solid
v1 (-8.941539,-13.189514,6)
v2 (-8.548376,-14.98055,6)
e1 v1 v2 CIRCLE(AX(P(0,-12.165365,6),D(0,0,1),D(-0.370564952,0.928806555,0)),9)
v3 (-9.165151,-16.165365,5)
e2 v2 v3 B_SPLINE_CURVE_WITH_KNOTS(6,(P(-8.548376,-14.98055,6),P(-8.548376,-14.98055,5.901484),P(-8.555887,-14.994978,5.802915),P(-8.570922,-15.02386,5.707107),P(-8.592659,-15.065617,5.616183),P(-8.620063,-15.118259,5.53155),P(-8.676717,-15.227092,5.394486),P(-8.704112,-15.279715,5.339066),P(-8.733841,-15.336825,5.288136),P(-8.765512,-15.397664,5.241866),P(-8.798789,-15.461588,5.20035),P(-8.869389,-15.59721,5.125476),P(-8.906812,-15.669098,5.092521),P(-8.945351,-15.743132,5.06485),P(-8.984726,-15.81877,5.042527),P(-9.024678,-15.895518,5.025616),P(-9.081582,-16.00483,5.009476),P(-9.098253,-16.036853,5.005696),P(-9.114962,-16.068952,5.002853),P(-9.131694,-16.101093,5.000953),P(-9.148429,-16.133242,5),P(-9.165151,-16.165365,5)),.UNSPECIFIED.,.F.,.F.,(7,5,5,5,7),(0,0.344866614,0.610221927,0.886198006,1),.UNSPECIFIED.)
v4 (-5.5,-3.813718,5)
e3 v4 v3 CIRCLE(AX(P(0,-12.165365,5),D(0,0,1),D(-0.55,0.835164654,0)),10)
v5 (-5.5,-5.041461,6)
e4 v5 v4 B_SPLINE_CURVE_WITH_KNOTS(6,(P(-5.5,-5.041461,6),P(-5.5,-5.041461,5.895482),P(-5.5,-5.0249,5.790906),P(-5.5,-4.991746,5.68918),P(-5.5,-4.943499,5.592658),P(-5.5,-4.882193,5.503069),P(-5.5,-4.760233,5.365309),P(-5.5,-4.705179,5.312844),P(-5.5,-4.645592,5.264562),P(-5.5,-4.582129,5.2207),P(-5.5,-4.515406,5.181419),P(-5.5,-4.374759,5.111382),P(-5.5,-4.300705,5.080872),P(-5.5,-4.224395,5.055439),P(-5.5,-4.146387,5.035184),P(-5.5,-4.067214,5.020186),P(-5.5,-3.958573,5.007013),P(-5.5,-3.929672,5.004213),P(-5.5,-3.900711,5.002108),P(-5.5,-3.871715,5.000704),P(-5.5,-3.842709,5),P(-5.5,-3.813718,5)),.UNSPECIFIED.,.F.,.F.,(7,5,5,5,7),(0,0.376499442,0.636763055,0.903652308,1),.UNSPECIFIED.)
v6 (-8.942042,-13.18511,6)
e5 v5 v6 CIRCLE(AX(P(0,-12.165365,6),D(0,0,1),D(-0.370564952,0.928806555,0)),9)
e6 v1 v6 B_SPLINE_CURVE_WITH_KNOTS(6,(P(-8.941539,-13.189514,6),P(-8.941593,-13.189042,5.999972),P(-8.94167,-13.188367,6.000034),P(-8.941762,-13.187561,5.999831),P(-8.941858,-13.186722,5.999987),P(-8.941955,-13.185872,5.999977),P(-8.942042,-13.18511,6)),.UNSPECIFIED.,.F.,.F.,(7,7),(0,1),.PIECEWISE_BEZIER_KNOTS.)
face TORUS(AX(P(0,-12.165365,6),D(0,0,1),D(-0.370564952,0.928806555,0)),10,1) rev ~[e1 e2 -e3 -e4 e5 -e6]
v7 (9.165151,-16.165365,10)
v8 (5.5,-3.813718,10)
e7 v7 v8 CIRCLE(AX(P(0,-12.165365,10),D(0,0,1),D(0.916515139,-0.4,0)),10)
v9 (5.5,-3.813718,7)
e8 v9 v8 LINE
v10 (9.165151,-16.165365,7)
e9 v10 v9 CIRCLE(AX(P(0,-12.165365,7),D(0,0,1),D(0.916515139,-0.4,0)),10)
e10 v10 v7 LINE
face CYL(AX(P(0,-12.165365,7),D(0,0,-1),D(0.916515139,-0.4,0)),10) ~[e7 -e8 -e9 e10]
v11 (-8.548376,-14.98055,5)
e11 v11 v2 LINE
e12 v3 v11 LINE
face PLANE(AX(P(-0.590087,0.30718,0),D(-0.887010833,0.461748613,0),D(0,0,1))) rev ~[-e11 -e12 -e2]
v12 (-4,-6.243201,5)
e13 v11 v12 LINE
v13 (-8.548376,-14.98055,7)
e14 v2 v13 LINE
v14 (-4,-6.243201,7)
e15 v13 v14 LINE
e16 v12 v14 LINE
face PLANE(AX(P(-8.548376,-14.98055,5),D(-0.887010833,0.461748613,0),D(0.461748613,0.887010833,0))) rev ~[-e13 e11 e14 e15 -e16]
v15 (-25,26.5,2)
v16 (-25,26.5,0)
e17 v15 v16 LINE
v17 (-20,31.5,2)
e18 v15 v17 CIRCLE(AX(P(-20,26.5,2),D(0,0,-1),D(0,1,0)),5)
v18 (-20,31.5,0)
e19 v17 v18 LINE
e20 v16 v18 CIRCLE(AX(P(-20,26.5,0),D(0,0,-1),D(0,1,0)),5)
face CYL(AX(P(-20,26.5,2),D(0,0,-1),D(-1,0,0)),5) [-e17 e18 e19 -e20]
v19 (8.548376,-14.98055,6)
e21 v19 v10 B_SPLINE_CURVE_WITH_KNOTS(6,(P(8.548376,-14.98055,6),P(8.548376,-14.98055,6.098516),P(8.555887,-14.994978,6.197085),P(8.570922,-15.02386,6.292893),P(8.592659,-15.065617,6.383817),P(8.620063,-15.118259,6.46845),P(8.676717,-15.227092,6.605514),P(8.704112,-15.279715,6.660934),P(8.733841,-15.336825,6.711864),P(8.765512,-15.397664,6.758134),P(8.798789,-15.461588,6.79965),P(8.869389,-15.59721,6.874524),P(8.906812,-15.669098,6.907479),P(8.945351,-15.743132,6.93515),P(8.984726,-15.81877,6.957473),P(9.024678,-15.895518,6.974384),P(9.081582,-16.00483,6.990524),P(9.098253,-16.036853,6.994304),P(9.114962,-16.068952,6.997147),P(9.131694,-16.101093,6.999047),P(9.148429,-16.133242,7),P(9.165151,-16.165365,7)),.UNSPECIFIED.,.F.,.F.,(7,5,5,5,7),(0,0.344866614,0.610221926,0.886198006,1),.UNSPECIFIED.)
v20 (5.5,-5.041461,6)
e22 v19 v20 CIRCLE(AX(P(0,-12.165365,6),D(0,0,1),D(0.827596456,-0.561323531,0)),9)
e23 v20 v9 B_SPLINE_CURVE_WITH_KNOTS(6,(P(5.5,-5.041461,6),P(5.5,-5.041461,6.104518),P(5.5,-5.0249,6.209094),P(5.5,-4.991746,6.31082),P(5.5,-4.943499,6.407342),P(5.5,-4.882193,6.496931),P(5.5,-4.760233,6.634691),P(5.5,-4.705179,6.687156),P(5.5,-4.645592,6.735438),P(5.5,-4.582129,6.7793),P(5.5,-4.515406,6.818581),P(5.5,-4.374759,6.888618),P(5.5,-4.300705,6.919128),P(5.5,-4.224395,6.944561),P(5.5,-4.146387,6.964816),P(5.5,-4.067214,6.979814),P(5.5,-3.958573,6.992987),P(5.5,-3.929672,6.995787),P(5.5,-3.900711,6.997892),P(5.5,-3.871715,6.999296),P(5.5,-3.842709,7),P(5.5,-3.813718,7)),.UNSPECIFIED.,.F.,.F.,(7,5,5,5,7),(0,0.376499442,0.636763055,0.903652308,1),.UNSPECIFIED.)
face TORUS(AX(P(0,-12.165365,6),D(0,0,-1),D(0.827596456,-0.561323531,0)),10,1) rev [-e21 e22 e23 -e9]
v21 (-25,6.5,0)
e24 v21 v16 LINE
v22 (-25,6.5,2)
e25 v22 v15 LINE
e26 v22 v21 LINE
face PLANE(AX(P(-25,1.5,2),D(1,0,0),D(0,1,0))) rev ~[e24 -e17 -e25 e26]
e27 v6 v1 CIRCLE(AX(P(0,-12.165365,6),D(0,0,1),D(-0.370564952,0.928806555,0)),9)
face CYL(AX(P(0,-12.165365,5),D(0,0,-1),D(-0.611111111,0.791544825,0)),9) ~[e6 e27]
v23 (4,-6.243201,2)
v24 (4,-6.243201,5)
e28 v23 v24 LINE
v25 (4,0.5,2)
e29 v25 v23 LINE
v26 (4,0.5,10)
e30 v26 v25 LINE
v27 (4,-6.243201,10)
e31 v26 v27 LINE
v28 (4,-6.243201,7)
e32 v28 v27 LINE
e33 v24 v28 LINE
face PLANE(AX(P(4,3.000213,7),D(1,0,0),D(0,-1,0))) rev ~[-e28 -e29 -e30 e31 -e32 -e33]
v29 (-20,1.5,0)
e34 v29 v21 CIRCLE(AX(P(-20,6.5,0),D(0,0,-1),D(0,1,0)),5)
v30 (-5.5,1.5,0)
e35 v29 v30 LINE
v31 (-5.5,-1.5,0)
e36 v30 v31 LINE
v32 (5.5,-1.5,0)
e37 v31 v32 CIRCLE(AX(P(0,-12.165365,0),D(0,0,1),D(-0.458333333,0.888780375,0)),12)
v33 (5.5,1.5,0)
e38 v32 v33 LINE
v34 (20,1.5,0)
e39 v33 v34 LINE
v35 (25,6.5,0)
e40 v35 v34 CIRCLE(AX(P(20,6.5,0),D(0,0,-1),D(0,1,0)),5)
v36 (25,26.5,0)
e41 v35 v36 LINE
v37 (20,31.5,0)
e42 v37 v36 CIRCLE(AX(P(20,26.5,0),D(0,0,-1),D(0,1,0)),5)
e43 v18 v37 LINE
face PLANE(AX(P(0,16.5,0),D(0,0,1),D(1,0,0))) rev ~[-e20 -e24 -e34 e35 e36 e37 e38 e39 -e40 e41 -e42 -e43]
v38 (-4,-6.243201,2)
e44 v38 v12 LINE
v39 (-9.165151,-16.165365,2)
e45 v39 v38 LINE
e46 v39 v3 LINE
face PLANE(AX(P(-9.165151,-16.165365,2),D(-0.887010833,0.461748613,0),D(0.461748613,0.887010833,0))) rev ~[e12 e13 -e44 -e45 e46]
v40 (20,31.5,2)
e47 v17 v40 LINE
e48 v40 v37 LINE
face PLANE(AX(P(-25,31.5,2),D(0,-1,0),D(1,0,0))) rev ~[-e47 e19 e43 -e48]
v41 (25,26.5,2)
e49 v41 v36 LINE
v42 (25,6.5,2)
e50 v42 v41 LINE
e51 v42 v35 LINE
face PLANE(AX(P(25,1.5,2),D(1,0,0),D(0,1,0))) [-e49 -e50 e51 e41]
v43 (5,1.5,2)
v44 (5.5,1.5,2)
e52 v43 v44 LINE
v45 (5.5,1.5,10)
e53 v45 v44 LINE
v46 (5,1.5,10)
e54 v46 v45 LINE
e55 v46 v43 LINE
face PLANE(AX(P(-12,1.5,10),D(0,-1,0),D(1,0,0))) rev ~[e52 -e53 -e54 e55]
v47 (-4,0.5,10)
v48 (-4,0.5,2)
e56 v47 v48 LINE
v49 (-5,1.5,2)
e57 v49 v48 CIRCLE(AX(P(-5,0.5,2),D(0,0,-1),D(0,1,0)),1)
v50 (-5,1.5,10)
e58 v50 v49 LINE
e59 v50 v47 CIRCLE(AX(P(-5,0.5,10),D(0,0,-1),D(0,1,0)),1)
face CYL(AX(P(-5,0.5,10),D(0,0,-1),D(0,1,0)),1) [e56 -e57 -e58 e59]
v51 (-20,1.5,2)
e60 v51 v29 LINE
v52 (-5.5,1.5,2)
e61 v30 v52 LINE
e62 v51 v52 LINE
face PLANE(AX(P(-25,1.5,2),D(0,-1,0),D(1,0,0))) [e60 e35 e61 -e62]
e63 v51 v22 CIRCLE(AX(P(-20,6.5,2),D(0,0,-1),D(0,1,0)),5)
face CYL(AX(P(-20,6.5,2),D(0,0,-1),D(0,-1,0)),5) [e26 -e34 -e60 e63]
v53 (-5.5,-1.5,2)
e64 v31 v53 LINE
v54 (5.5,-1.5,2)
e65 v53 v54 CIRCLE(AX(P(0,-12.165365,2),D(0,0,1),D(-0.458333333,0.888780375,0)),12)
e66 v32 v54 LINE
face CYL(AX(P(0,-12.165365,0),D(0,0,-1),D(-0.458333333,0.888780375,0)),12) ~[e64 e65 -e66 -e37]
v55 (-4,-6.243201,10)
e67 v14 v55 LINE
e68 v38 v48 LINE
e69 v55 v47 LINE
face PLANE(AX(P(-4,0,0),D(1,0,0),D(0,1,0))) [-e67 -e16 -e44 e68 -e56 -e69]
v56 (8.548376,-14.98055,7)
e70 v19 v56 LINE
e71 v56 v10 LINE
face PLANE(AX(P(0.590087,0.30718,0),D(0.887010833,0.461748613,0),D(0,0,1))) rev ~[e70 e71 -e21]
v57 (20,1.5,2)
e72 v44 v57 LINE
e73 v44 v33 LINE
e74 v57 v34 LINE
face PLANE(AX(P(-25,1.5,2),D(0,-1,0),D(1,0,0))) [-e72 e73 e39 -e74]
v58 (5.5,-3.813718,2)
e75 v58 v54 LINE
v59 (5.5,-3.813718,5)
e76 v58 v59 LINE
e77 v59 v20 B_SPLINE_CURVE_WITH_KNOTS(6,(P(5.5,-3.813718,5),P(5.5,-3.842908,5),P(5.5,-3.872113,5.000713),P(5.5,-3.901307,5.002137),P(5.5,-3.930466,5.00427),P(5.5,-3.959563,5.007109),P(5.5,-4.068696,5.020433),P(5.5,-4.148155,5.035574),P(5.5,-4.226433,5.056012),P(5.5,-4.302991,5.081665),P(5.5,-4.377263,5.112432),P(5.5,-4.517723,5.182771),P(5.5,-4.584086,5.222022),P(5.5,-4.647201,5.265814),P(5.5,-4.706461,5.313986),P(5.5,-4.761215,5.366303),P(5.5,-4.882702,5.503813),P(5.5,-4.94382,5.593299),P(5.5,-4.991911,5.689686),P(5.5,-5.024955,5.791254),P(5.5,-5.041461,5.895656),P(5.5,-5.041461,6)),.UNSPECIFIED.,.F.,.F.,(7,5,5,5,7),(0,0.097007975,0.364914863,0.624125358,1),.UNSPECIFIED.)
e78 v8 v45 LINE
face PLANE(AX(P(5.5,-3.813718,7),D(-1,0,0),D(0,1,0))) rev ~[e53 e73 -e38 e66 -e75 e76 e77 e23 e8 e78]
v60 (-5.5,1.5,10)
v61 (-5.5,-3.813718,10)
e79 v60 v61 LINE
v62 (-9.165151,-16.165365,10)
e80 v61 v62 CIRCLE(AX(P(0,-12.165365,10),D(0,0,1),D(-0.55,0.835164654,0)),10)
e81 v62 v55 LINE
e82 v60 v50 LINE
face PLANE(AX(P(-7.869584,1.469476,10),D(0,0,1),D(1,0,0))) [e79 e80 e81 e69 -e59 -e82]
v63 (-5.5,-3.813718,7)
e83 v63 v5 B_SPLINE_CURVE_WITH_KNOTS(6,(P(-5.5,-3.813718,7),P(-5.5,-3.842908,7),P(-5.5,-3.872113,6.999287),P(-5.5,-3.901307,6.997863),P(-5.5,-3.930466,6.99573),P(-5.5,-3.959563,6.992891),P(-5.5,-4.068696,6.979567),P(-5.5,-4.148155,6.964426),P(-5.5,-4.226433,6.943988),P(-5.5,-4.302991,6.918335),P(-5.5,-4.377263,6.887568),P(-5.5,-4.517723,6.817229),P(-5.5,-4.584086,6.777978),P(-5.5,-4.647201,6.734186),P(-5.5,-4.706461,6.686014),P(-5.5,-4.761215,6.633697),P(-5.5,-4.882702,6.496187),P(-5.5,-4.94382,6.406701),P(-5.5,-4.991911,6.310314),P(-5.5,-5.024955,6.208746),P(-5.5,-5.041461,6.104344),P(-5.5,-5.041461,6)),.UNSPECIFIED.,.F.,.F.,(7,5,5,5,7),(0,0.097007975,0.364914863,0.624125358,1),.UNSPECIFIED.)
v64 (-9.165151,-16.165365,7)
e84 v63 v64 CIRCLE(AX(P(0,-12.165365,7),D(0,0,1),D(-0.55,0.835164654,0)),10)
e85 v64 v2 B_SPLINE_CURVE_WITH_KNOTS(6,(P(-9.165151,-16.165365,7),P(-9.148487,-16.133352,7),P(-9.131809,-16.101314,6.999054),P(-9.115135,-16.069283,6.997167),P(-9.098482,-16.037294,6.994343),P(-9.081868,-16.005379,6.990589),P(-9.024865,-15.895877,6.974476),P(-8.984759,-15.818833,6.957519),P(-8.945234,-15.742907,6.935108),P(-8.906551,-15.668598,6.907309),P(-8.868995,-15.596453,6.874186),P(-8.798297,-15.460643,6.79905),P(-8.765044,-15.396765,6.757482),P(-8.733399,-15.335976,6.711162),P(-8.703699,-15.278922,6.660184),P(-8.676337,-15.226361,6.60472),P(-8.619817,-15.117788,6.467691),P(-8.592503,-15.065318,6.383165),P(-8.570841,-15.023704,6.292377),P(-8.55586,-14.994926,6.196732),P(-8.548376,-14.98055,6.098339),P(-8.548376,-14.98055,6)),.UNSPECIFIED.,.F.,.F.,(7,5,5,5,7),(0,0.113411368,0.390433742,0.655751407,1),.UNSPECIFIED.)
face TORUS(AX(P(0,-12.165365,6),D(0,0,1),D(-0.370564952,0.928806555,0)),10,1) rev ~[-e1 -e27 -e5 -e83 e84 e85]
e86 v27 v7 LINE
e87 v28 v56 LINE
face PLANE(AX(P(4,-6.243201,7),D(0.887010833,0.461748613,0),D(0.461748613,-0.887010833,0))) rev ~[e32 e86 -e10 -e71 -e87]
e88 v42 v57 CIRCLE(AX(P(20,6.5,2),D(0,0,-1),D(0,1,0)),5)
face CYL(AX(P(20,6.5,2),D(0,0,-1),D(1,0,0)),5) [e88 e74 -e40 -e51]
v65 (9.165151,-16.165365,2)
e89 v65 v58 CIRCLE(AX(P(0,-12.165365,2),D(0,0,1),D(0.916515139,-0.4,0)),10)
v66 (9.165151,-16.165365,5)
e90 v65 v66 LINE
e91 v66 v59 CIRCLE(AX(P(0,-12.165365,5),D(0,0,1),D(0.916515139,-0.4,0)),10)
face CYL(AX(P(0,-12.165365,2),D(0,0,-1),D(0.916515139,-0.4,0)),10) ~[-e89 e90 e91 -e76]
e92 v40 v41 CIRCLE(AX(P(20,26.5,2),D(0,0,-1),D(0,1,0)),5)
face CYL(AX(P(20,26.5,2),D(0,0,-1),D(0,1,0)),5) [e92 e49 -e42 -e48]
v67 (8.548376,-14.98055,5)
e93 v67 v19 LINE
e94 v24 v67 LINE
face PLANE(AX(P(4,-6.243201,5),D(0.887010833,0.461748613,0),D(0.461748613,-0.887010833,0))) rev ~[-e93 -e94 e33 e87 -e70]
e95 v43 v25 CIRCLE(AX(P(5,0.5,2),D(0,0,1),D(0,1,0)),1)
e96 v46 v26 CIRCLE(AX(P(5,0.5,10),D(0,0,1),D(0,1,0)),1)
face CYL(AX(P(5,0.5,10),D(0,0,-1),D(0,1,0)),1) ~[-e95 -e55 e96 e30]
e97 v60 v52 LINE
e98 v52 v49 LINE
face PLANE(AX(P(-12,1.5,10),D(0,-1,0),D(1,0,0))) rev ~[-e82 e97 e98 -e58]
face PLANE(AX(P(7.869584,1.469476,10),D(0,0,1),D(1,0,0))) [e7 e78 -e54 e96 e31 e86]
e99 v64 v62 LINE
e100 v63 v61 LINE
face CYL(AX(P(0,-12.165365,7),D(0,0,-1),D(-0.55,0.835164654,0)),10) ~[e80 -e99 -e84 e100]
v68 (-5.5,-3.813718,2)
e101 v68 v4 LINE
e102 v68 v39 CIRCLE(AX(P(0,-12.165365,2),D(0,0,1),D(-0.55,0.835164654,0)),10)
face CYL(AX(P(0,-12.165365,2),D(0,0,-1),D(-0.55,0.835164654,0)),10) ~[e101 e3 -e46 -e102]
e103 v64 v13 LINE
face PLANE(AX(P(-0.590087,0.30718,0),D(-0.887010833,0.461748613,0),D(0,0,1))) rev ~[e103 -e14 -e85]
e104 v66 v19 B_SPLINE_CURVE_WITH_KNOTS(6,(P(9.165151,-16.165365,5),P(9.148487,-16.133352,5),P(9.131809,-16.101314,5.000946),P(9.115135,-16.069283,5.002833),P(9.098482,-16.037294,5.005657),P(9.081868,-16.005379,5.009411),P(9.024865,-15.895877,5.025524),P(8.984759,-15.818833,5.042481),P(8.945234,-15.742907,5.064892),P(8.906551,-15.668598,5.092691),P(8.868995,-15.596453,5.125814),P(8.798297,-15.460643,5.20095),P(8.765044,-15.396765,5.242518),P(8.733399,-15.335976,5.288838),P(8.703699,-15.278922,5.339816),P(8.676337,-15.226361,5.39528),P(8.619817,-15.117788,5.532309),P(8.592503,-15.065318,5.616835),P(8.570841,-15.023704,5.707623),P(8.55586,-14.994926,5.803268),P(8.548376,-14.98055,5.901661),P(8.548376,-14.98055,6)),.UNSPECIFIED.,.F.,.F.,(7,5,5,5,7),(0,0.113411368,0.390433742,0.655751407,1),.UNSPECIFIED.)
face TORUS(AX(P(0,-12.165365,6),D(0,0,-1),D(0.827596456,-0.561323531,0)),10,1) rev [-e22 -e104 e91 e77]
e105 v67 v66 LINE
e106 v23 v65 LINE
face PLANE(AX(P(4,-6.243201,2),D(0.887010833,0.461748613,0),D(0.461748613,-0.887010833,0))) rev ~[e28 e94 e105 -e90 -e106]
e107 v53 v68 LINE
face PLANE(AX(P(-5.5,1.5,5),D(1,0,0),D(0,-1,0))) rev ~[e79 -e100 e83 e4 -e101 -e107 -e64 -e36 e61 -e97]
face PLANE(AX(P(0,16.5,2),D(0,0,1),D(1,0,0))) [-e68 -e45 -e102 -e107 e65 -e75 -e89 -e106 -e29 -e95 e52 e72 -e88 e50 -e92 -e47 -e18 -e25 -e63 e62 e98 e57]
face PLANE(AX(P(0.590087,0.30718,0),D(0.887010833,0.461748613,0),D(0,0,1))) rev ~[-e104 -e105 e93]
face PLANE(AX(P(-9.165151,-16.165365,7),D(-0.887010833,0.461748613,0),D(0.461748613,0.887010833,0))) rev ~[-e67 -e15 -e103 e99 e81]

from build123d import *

# Parameters (mm, degrees)
F1_DEPTH     = 2
F3_DEPTH     = 3
F5_DEPTH     = 2
F7_DEPTH     = 3
F8_T4_ANGLE  = 102.3969146675
F8_T10_ANGLE = 102.3969146675
F8_T16_ANGLE = 102.3969146675
F8_T22_ANGLE = 102.3969146675
F8_T26_ANGLE = 121.7069479791
F8_T28_ANGLE = 121.7069479791
F8_T30_ANGLE = 121.7069479791
F8_T32_ANGLE = 121.7069479791
F9_W         = 24
F9_H         = 22.6653645039
F10_DEPTH    = 8
F11_W        = 50
F11_H        = 30
F12_DEPTH    = 2
F13_R        = 1
F14_R        = 5


# Not quite as in the source:
# - a fillet or chamfer that OpenCascade refuses, or shapes differently, is made with other operations: its cross-section is extruded or revolved along the edge and cut away or added


with BuildPart() as f1:
    # F0 (on Top) → F1 (new body)
    with BuildSketch(Plane.XY):
        with BuildLine():
            ThreePointArc((5.5, 1.5), (0, 24.1653645039), (-5.5, 1.5))
            Line((-5.5, 1.5), (-5.5, -1.5))
            ThreePointArc((-5.5, -1.5), (0, -24.1653645039), (5.5, -1.5))
            Line((5.5, -1.5), (5.5, 1.5))
        make_face()
    extrude(amount=F1_DEPTH)

    # F2 (on face) → F3 (join)
    with BuildSketch(Plane.XY.offset(2)):
        with BuildLine():
            Line((9.7844830762, 19.1125863177), (8.6602540378, 17.1653645039))
            ThreePointArc((8.6602540378, 17.1653645039), (9.4991255677, 9.0402063559), (4, 3.0002131139))
            Line((4, 3.0002131139), (4, -6.2432010007))
            Line((4, -6.2432010007), (9.1651513899, -16.1653645039))
            ThreePointArc((9.1651513899, -16.1653645039), (9.5868378212, -9.3206253964), (5.5, -3.8137179596))
            Line((5.5, -3.8137179596), (5.5, 1.5))
            ThreePointArc((5.5, 1.5), (11.6599594736, 9.3289327537), (9.7844830762, 19.1125863177))
        make_face()
        with BuildLine():
            ThreePointArc((-4, 3.0002131139), (-9.4991255677, 9.0402063559), (-8.6602540378, 17.1653645039))
            Line((-8.6602540378, 17.1653645039), (-9.7844830762, 19.1125863177))
            ThreePointArc((-9.7844830762, 19.1125863177), (-11.6599594736, 9.3289327537), (-5.5, 1.5))
            Line((-5.5, 1.5), (-5.5, -3.8137179596))
            ThreePointArc((-5.5, -3.8137179596), (-9.5868378212, -9.3206253964), (-9.1651513899, -16.1653645039))
            Line((-9.1651513899, -16.1653645039), (-4, -6.2432010007))
            Line((-4, -6.2432010007), (-4, 3.0002131139))
        make_face()
    extrude(amount=F3_DEPTH)

    # F4 (on face) → F5 (join)
    with BuildSketch(Plane.XY.offset(5)):
        with BuildLine():
            Line((-8.0717844057, 16.1461052023), (-9.7844830762, 19.1125863177))
            ThreePointArc((-9.7844830762, 19.1125863177), (-11.6599594736, 9.3289327537), (-5.5, 1.5))
            Line((-5.5, 1.5), (-5.5, -5.0414610795))
            ThreePointArc((-5.5, -5.0414610795), (-8.6043935433, -9.5263473097), (-8.5483759414, -14.980549891))
            Line((-8.5483759414, -14.980549891), (-4, -6.2432010007))
            Line((-4, -6.2432010007), (-4, 4.1031067556))
            ThreePointArc((-4, 4.1031067556), (-8.5258693153, 9.2827350759), (-8.0717844057, 16.1461052023))
        make_face()
        with BuildLine():
            ThreePointArc((5.5, 1.5), (11.6599594736, 9.3289327537), (9.7844830762, 19.1125863177))
            Line((9.7844830762, 19.1125863177), (8.0717844057, 16.1461052023))
            ThreePointArc((8.0717844057, 16.1461052023), (8.5258693153, 9.2827350759), (4, 4.1031067556))
            Line((4, 4.1031067556), (4, -6.2432010007))
            Line((4, -6.2432010007), (8.5483759414, -14.980549891))
            ThreePointArc((8.5483759414, -14.980549891), (8.6043935433, -9.5263473097), (5.5, -5.0414610795))
            Line((5.5, -5.0414610795), (5.5, 1.5))
        make_face()
    extrude(amount=F5_DEPTH)

    # F6 (on face) → F7 (join)
    with BuildSketch(Plane.XY.offset(7)):
        with BuildLine():
            Line((9.7844830762, 19.1125863177), (8.6602540378, 17.1653645039))
            ThreePointArc((8.6602540378, 17.1653645039), (9.4991255677, 9.0402063559), (4, 3.0002131139))
            Line((4, 3.0002131139), (4, -6.2432010007))
            Line((4, -6.2432010007), (9.1651513899, -16.1653645039))
            ThreePointArc((9.1651513899, -16.1653645039), (9.5868378212, -9.3206253964), (5.5, -3.8137179596))
            Line((5.5, -3.8137179596), (5.5, 1.5))
            ThreePointArc((5.5, 1.5), (11.6599594736, 9.3289327537), (9.7844830762, 19.1125863177))
        make_face()
        with BuildLine():
            ThreePointArc((-4, 3.0002131139), (-9.4991255677, 9.0402063559), (-8.6602540378, 17.1653645039))
            Line((-8.6602540378, 17.1653645039), (-9.7844830762, 19.1125863177))
            ThreePointArc((-9.7844830762, 19.1125863177), (-11.6599594736, 9.3289327537), (-5.5, 1.5))
            Line((-5.5, 1.5), (-5.5, -3.8137179596))
            ThreePointArc((-5.5, -3.8137179596), (-9.5868378212, -9.3206253964), (-9.1651513899, -16.1653645039))
            Line((-9.1651513899, -16.1653645039), (-4, -6.2432010007))
            Line((-4, -6.2432010007), (-4, 3.0002131139))
        make_face()
    extrude(amount=F7_DEPTH)

    # F8: fillet of radius 1 on 8 edges, made by hand


with BuildPart() as f8_tool2:
    # F8_s3 → F8_t4 (revolve)
    with BuildSketch(Plane(origin=(-4.1871135562, -1.6705281924, 0), x_dir=(0, 0, 1), z_dir=(0.9288065548, 0.3705649522, 0))):
        with BuildLine():
            ThreePointArc((6, 2.2992702923), (5.2928932188, 2.0063770734), (5, 1.2992702923))
            Line((5, 1.2992702923), (5, 2.2992702923))
            Line((5, 2.2992702923), (6, 2.2992702923))
        make_face()
    revolve(axis=Axis((0, -12.1653645039, 5), (0, 0, 1)), revolution_arc=F8_T4_ANGLE)

    split(bisect_by=Plane(origin=(-0.5900874414, 0.3071800789, 0), x_dir=(0, 0, 1), z_dir=(-0.8870108332, 0.4617486132, 0)), keep=Keep.TOP)

    split(bisect_by=Plane.YZ.offset(-4), keep=Keep.BOTTOM)


with BuildPart() as f1_1:
    add(f1.part)

    # F8_t1: union F8_tool2
    add(f8_tool2.part)


with BuildPart() as f8_tool8:
    # F8_s9 → F8_t10 (revolve)
    with BuildSketch(Plane(origin=(-4.1871135562, -1.6705281924, 0), x_dir=(0, 0, 1), z_dir=(0.9288065548, 0.3705649522, 0))):
        with BuildLine():
            ThreePointArc((7, 1.2992702923), (6.7071067812, 2.0063770734), (6, 2.2992702923))
            Line((6, 2.2992702923), (7, 2.2992702923))
            Line((7, 2.2992702923), (7, 1.2992702923))
        make_face()
    revolve(axis=Axis((0, -12.1653645039, 7), (0, 0, 1)), revolution_arc=F8_T10_ANGLE)

    split(bisect_by=Plane(origin=(-0.5900874414, 0.3071800789, 0), x_dir=(0, 0, 1), z_dir=(-0.8870108332, 0.4617486132, 0)), keep=Keep.TOP)

    split(bisect_by=Plane.YZ.offset(-4), keep=Keep.BOTTOM)


with BuildPart() as f1_2:
    add(f1_1.part)

    # F8_t7: union F8_tool8
    add(f8_tool8.part)


with BuildPart() as f8_tool14:
    # F8_s15 → F8_t16 (revolve)
    with BuildSketch(Plane(origin=(-5.6514123525, -8.3322514997, 0), x_dir=(0, 0, 1), z_dir=(-0.561323531, -0.8275964557, 0))):
        with BuildLine():
            ThreePointArc((6, -15.828705359), (6.7071067812, -16.1215985778), (7, -16.828705359))
            Line((7, -16.828705359), (7, -15.828705359))
            Line((7, -15.828705359), (6, -15.828705359))
        make_face()
    revolve(axis=Axis((0, -12.1653645039, 7), (0, 0, 1)), revolution_arc=F8_T16_ANGLE)

    split(bisect_by=Plane.YZ.offset(4), keep=Keep.TOP)

    split(bisect_by=Plane(origin=(0.5900874414, 0.3071800789, 0), x_dir=(0, 0, 1), z_dir=(0.8870108332, 0.4617486132, 0)), keep=Keep.TOP)


with BuildPart() as f1_3:
    add(f1_2.part)

    # F8_t13: union F8_tool14
    add(f8_tool14.part)


with BuildPart() as f8_tool20:
    # F8_s21 → F8_t22 (revolve)
    with BuildSketch(Plane(origin=(-5.6514123525, -8.3322514997, 0), x_dir=(0, 0, 1), z_dir=(-0.561323531, -0.8275964557, 0))):
        with BuildLine():
            ThreePointArc((5, -16.828705359), (5.2928932188, -16.1215985778), (6, -15.828705359))
            Line((6, -15.828705359), (5, -15.828705359))
            Line((5, -15.828705359), (5, -16.828705359))
        make_face()
    revolve(axis=Axis((0, -12.1653645039, 5), (0, 0, 1)), revolution_arc=F8_T22_ANGLE)

    split(bisect_by=Plane.YZ.offset(4), keep=Keep.TOP)

    split(bisect_by=Plane(origin=(0.5900874414, 0.3071800789, 0), x_dir=(0, 0, 1), z_dir=(0.8870108332, 0.4617486132, 0)), keep=Keep.TOP)


with BuildPart() as f1_4:
    add(f1_3.part)

    # F8_t19: union F8_tool20
    add(f8_tool20.part)

    # F8_s25 → F8_t26 (revolve, cut)
    with BuildSketch(Plane(origin=(-6.0530874143, 6.6819786169, 0), x_dir=(0, 0, 1), z_dir=(-0.6713698624, 0.7411224648, 0))):
        with BuildLine():
            ThreePointArc((7, 18.1674590926), (6.7071067812, 17.4603523114), (6, 17.1674590926))
            Line((6, 17.1674590926), (7, 17.1674590926))
            Line((7, 17.1674590926), (7, 18.1674590926))
        make_face()
    revolve(axis=Axis((0, 12.1653645039, 7), (0, 0, -1)), revolution_arc=F8_T26_ANGLE, mode=Mode.SUBTRACT)

    # F8_s27 → F8_t28 (revolve, cut)
    with BuildSketch(Plane(origin=(-2.1730837017, 0.4014208952, 0), x_dir=(0, 0, 1), z_dir=(0.9833630917, -0.1816508459, 0))):
        with BuildLine():
            ThreePointArc((6, -2.9629704506), (6.7071067812, -2.6700772318), (7, -1.9629704506))
            Line((7, -1.9629704506), (7, -2.9629704506))
            Line((7, -2.9629704506), (6, -2.9629704506))
        make_face()
    revolve(axis=Axis((0, 12.1653645039, 7), (0, 0, -1)), revolution_arc=F8_T28_ANGLE, mode=Mode.SUBTRACT)

    # F8_s29 → F8_t30 (revolve, cut)
    with BuildSketch(Plane(origin=(-2.1730837017, 0.4014208952, 0), x_dir=(0, 0, 1), z_dir=(0.9833630917, -0.1816508459, 0))):
        with BuildLine():
            ThreePointArc((5, -1.9629704506), (5.2928932188, -2.6700772318), (6, -2.9629704506))
            Line((6, -2.9629704506), (5, -2.9629704506))
            Line((5, -2.9629704506), (5, -1.9629704506))
        make_face()
    revolve(axis=Axis((0, 12.1653645039, 5), (0, 0, -1)), revolution_arc=F8_T30_ANGLE, mode=Mode.SUBTRACT)

    # F8_s31 → F8_t32 (revolve, cut)
    with BuildSketch(Plane(origin=(-6.0530874143, 6.6819786169, 0), x_dir=(0, 0, 1), z_dir=(-0.6713698624, 0.7411224648, 0))):
        with BuildLine():
            ThreePointArc((6, 17.1674590926), (5.2928932188, 17.4603523114), (5, 18.1674590926))
            Line((5, 18.1674590926), (5, 17.1674590926))
            Line((5, 17.1674590926), (6, 17.1674590926))
        make_face()
    revolve(axis=Axis((0, 12.1653645039, 5), (0, 0, -1)), revolution_arc=F8_T32_ANGLE, mode=Mode.SUBTRACT)

    # F9 (on face) → F10 (cut)
    with BuildSketch(Plane.XY.offset(10)):
        with Locations((0, 12.8326822519)):
            Rectangle(F9_W, F9_H)
    extrude(amount=-F10_DEPTH, mode=Mode.SUBTRACT)

    # F11 (on face) → F12 (join)
    with BuildSketch(Plane.XY.offset(2)):
        with Locations((0, 16.5)):
            Rectangle(F11_W, F11_H)
    extrude(amount=-F12_DEPTH)

    # F13
    f13_edges = [f1_4.edges().sort_by_distance(p)[0] for p in [
        (-4, 1.5, 6),
        (4, 1.5, 6),
    ]]
    fillet(f13_edges, radius=F13_R)

    # F14
    f14_edges = [f1_4.edges().sort_by_distance(p)[0] for p in [
        (-25, 1.5, 1),
        (-25, 31.5, 1),
        (25, 31.5, 1),
        (25, 1.5, 1),
    ]]
    fillet(f14_edges, radius=F14_R)


solid = f1_4.part
